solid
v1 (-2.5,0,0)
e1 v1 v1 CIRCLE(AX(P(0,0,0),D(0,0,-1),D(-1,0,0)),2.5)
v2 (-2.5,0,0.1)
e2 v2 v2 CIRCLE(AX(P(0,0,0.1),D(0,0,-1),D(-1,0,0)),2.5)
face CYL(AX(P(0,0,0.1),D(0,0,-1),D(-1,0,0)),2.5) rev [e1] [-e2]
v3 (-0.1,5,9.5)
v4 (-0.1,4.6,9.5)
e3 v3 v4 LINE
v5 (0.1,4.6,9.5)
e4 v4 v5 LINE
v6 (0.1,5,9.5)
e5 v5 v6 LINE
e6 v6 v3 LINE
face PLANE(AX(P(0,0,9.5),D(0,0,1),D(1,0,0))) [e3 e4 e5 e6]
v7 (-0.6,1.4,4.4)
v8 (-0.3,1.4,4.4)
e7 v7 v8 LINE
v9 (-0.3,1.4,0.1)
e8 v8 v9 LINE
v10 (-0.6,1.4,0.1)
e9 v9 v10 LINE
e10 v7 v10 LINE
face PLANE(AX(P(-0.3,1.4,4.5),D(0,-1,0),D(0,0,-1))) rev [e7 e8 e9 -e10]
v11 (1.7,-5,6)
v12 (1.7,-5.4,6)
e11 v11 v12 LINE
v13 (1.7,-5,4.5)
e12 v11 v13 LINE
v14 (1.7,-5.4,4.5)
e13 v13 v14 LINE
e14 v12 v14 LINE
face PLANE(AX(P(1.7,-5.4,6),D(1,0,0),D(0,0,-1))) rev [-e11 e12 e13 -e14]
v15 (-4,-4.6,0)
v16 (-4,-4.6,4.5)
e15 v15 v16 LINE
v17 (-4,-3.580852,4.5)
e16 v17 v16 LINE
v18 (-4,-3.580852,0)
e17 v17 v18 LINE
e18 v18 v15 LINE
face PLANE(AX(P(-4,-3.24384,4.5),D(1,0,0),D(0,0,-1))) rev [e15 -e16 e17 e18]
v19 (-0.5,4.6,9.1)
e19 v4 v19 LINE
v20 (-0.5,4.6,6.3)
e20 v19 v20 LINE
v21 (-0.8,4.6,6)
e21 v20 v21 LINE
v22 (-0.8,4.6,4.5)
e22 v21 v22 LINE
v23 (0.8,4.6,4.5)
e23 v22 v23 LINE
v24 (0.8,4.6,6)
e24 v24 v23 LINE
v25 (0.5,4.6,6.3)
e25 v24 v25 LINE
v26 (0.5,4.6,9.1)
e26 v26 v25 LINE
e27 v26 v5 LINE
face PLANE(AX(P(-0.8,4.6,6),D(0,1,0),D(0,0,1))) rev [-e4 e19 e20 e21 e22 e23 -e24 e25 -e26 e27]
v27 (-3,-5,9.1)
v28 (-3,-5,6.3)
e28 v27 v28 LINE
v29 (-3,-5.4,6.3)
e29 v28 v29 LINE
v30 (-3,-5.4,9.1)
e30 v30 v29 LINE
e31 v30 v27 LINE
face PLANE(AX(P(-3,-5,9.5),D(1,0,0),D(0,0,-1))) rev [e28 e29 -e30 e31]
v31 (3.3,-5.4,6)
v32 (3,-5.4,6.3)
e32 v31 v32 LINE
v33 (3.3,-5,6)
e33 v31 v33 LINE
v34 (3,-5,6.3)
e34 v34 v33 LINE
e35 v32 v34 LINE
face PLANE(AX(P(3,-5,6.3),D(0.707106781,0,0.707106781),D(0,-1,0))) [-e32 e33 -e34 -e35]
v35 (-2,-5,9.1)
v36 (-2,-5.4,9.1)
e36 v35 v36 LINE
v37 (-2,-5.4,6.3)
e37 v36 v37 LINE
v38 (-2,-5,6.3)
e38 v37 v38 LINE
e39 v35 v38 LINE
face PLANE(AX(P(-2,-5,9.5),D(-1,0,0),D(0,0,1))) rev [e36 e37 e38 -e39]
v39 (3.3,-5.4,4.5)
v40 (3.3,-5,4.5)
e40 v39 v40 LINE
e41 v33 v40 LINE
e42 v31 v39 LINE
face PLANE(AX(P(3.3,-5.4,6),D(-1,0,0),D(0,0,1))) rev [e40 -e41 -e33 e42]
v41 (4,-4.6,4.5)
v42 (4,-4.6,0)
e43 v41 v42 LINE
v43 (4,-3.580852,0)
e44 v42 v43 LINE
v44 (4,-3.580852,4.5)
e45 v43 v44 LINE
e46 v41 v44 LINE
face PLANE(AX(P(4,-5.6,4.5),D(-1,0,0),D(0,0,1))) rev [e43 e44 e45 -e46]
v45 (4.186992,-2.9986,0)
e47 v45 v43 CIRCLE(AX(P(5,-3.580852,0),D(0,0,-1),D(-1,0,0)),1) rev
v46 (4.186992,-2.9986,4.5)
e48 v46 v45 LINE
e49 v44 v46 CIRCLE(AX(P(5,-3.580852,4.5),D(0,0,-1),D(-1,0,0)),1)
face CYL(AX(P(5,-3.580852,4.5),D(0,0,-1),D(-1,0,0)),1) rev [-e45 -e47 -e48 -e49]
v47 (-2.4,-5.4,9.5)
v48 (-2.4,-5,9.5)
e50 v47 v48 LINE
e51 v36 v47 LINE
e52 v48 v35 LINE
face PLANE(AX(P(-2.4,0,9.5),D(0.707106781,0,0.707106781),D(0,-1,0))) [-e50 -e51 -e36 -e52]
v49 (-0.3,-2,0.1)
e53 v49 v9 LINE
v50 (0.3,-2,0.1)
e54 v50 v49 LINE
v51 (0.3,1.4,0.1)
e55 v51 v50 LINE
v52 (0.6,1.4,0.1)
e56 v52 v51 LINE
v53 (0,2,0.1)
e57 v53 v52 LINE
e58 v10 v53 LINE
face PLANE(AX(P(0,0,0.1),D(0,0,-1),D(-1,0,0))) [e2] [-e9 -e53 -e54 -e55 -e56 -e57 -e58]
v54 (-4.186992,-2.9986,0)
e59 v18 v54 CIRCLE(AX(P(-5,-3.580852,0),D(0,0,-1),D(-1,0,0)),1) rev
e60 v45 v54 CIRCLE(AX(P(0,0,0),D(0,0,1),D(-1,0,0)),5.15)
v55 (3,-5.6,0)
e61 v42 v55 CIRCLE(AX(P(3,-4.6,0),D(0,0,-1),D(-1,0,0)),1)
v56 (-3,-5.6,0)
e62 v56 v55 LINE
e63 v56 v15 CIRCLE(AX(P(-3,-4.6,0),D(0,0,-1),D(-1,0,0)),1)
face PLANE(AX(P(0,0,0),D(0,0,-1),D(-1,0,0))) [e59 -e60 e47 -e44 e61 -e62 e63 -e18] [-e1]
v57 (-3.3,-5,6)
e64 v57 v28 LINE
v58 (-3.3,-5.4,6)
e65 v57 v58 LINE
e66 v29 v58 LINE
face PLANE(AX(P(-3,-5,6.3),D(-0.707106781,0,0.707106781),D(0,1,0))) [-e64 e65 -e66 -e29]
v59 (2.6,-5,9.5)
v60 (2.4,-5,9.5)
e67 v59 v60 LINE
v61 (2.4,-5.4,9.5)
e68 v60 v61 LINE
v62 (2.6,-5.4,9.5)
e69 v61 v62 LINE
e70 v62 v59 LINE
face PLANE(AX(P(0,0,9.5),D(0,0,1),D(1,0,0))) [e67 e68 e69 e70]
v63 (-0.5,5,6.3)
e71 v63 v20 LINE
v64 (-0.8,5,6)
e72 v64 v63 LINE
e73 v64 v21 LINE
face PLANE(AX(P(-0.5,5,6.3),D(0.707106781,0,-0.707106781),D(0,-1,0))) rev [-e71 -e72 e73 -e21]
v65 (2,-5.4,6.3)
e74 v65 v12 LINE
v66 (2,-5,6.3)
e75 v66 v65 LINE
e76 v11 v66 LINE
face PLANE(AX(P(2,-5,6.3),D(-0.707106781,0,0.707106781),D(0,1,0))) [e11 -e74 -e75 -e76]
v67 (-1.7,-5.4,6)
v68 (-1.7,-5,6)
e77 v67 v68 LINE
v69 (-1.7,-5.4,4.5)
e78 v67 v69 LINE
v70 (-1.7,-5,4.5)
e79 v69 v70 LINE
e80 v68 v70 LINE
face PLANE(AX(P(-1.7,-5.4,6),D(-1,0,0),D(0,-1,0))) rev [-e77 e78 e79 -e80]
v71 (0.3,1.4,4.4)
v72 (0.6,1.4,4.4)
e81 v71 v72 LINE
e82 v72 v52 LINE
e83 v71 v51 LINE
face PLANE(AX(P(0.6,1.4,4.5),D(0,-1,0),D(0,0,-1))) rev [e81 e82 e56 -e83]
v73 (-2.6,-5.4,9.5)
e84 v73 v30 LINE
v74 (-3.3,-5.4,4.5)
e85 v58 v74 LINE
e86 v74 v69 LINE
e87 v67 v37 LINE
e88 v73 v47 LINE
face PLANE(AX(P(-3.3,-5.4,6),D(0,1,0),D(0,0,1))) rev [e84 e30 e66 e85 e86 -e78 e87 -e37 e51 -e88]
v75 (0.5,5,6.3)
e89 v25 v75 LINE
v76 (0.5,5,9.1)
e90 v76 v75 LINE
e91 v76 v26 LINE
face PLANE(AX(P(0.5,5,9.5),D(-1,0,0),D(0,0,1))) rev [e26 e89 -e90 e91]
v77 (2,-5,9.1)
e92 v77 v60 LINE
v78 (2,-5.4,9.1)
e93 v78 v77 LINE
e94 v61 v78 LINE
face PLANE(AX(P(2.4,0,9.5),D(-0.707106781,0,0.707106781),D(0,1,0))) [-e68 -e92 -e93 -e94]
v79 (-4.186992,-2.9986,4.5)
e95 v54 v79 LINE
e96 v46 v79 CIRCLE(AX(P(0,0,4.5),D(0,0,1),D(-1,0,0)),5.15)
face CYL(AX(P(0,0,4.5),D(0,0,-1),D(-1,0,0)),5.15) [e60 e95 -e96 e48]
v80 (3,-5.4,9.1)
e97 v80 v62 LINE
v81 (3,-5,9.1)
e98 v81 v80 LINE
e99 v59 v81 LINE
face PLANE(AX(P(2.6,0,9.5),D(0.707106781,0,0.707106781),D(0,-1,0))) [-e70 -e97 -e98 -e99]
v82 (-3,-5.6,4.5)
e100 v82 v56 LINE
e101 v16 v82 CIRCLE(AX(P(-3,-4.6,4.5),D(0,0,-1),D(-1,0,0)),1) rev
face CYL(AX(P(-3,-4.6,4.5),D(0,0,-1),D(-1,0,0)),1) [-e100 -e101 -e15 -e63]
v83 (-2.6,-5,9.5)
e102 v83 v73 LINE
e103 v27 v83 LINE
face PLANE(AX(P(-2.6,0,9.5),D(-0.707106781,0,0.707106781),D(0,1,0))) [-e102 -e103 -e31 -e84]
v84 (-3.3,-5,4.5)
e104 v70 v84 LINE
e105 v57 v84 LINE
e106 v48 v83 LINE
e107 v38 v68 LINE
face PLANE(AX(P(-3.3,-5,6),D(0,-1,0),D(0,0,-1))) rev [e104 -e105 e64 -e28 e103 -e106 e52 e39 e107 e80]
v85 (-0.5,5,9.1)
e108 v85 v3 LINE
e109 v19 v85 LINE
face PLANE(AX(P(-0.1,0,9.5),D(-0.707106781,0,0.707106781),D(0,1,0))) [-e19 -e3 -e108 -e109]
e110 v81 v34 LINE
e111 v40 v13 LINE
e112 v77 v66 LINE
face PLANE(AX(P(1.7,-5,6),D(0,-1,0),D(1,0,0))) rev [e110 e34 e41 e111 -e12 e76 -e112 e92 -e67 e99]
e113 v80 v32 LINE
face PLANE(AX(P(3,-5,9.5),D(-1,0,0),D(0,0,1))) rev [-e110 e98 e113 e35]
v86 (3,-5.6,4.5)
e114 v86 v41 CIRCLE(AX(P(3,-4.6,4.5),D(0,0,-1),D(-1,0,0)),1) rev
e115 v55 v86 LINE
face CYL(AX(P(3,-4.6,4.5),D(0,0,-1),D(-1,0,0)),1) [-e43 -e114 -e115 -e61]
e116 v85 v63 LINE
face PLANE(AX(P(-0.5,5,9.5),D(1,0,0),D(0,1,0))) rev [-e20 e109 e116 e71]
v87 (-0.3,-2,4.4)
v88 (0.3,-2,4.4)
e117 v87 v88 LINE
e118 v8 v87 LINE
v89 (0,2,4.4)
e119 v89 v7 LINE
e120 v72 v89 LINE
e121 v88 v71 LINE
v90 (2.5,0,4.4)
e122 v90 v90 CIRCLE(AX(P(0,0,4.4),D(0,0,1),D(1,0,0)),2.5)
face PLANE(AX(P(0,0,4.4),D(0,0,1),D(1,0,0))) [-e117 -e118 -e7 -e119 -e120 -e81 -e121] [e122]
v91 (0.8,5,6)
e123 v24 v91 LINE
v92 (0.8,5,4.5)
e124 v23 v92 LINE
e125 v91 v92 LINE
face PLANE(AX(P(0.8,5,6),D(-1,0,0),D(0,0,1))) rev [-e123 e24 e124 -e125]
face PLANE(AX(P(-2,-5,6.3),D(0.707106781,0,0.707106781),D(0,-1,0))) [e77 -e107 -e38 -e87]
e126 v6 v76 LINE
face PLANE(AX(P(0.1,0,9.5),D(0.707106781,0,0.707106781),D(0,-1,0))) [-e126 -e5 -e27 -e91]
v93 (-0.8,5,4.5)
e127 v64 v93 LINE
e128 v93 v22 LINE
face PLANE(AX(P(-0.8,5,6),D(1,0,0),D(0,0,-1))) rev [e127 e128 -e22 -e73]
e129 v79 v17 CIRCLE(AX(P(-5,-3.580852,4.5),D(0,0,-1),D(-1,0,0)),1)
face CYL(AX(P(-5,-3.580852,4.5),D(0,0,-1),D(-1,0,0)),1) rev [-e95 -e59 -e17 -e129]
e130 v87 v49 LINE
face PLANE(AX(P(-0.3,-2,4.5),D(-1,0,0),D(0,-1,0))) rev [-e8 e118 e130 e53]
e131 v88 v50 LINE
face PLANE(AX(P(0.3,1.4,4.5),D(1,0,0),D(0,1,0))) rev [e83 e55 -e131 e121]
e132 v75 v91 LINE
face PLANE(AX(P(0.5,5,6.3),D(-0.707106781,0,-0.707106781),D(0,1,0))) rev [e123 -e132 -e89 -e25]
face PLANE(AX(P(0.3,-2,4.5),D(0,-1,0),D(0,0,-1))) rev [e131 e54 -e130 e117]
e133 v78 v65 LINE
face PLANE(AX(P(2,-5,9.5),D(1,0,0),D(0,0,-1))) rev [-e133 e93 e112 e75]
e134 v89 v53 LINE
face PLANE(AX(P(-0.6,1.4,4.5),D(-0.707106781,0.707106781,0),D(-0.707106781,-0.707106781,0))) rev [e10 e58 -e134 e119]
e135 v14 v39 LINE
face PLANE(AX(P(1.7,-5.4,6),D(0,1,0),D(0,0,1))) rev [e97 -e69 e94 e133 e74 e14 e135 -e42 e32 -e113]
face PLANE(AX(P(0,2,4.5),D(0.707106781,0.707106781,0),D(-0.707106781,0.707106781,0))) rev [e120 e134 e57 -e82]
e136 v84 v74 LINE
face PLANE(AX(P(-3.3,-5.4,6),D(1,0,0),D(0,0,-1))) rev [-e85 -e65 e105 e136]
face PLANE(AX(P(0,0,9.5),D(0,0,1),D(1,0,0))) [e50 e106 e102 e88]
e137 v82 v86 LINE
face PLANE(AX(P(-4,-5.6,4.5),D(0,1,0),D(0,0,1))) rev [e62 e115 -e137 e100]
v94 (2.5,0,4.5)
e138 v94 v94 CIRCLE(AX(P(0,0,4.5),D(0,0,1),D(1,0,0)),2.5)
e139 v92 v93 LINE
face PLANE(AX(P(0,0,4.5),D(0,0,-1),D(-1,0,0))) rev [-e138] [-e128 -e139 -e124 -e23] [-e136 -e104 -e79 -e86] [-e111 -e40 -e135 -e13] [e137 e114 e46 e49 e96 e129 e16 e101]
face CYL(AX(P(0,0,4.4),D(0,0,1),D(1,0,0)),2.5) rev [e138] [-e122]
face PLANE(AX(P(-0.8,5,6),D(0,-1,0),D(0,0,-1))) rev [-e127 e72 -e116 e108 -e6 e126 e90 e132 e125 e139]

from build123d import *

# Parameters (mm, degrees)
BOSS_EXTRU_1_DEPTH      = 4.5
ESQUISSE4_R             = 2.5
ENL_V_MAT_EXTRU_1_DEPTH = 0.1
ENL_V_START             = -0.1
ESQUISSE5_R             = 2.5
ENL_V_MAT_EXTRU_2_DEPTH = 0.1
ENL_V_MAT_EXTRU_3_DEPTH = 9.788771245
CONG_1_R                = 1
ESQUISSE7_W             = 1.6
ESQUISSE7_H             = 0.4
BOSS_EXTRU_4_DEPTH      = 1.5
ESQUISSE8_W             = 1
ESQUISSE8_H             = 0.4
BOSS_EXTRU_5_DEPTH      = 3.5
CHANFREIN3_SIZE         = 0.3
CHANFREIN4_SIZE         = 0.4


with BuildPart() as part:
    # Esquisse1 → Boss.-Extru.1 (new body)
    with BuildSketch(Plane.XY):
        with BuildLine():
            Line((-4, -3.243840317), (-4, -5.6))
            Line((-4, -5.6), (4, -5.6))
            Line((4, -5.6), (4, -3.243840317))
            ThreePointArc((4, -3.243840317), (0, 5.15), (-4, -3.243840317))
        make_face()
    extrude(amount=BOSS_EXTRU_1_DEPTH)

    # Esquisse4 → Enlèv. mat.-Extru.1 (cut)
    with BuildSketch(Plane(origin=(0, 0, 0), x_dir=(-1, 0, 0), z_dir=(0, 0, -1))):
        Circle(ESQUISSE4_R)
    extrude(amount=-ENL_V_MAT_EXTRU_1_DEPTH, mode=Mode.SUBTRACT)

    # Esquisse5 → Enlèv. mat.-Extru.2 (cut)
    with BuildSketch(Plane.XY.offset(4.5).offset(ENL_V_START)):
        with Locations(Location((0, 0, 0), (0, 0, 180))):
            Circle(ESQUISSE5_R)
    extrude(amount=ENL_V_MAT_EXTRU_2_DEPTH, mode=Mode.SUBTRACT)

    # Esquisse6 → Enlèv. mat.-Extru.3 (cut, through all)
    with BuildSketch(Plane(origin=(0, 0, 0.1), x_dir=(-1, 0, 0), z_dir=(0, 0, -1))):
        Polygon((0, 2), (-0.6, 1.4), (-0.3, 1.4), (-0.3, -2), (0.3, -2), (0.3, 1.4), (0.6, 1.4), align=None)
    extrude(amount=-ENL_V_MAT_EXTRU_3_DEPTH, mode=Mode.SUBTRACT)

    # Congé1
    cong_1_edges = [part.edges().sort_by_distance(p)[0] for p in [
        (4, -3.243840317, 2.25),
        (4, -5.6, 2.25),
        (-4, -5.6, 2.25),
        (-4, -3.243840317, 2.25),
    ]]
    fillet(cong_1_edges, radius=CONG_1_R)

    # Esquisse7 → Boss.-Extru.4 (add)
    with BuildSketch(Plane.XY.offset(4.5)):
        with Locations((-2.5, -5.2)):
            Rectangle(ESQUISSE7_W, ESQUISSE7_H)
        with Locations((2.5, -5.2)):
            Rectangle(ESQUISSE7_W, ESQUISSE7_H)
        with Locations((0, 4.8)):
            Rectangle(ESQUISSE7_W, ESQUISSE7_H)
    extrude(amount=BOSS_EXTRU_4_DEPTH)

    # Esquisse8 → Boss.-Extru.5 (add)
    with BuildSketch(Plane.XY.offset(6)):
        with Locations((0, 4.8)):
            Rectangle(ESQUISSE8_W, ESQUISSE8_H)
        with Locations((-2.5, -5.2)):
            Rectangle(ESQUISSE8_W, ESQUISSE8_H)
        with Locations((2.5, -5.2)):
            Rectangle(ESQUISSE8_W, ESQUISSE8_H)
    extrude(amount=BOSS_EXTRU_5_DEPTH)

    # Chanfrein3
    chanfrein3_edges = [part.edges().sort_by_distance(p)[0] for p in [
        (0.5, 4.8, 6),
        (-2, -5.2, 6),
        (3, -5.2, 6),
        (2, -5.2, 6),
        (-3, -5.2, 6),
        (-0.5, 4.8, 6),
    ]]
    chamfer(chanfrein3_edges, length=CHANFREIN3_SIZE - 0.0001)  # a hair under: the kernel refuses the full size

    # Chanfrein4
    chanfrein4_edges = [part.edges().sort_by_distance(p)[0] for p in [
        (-0.5, 4.8, 9.5),
        (0.5, 4.8, 9.5),
        (-3, -5.2, 9.5),
        (-2, -5.2, 9.5),
        (2, -5.2, 9.5),
        (3, -5.2, 9.5),
    ]]
    chamfer(chanfrein4_edges, length=CHANFREIN4_SIZE)


solid = part.part
